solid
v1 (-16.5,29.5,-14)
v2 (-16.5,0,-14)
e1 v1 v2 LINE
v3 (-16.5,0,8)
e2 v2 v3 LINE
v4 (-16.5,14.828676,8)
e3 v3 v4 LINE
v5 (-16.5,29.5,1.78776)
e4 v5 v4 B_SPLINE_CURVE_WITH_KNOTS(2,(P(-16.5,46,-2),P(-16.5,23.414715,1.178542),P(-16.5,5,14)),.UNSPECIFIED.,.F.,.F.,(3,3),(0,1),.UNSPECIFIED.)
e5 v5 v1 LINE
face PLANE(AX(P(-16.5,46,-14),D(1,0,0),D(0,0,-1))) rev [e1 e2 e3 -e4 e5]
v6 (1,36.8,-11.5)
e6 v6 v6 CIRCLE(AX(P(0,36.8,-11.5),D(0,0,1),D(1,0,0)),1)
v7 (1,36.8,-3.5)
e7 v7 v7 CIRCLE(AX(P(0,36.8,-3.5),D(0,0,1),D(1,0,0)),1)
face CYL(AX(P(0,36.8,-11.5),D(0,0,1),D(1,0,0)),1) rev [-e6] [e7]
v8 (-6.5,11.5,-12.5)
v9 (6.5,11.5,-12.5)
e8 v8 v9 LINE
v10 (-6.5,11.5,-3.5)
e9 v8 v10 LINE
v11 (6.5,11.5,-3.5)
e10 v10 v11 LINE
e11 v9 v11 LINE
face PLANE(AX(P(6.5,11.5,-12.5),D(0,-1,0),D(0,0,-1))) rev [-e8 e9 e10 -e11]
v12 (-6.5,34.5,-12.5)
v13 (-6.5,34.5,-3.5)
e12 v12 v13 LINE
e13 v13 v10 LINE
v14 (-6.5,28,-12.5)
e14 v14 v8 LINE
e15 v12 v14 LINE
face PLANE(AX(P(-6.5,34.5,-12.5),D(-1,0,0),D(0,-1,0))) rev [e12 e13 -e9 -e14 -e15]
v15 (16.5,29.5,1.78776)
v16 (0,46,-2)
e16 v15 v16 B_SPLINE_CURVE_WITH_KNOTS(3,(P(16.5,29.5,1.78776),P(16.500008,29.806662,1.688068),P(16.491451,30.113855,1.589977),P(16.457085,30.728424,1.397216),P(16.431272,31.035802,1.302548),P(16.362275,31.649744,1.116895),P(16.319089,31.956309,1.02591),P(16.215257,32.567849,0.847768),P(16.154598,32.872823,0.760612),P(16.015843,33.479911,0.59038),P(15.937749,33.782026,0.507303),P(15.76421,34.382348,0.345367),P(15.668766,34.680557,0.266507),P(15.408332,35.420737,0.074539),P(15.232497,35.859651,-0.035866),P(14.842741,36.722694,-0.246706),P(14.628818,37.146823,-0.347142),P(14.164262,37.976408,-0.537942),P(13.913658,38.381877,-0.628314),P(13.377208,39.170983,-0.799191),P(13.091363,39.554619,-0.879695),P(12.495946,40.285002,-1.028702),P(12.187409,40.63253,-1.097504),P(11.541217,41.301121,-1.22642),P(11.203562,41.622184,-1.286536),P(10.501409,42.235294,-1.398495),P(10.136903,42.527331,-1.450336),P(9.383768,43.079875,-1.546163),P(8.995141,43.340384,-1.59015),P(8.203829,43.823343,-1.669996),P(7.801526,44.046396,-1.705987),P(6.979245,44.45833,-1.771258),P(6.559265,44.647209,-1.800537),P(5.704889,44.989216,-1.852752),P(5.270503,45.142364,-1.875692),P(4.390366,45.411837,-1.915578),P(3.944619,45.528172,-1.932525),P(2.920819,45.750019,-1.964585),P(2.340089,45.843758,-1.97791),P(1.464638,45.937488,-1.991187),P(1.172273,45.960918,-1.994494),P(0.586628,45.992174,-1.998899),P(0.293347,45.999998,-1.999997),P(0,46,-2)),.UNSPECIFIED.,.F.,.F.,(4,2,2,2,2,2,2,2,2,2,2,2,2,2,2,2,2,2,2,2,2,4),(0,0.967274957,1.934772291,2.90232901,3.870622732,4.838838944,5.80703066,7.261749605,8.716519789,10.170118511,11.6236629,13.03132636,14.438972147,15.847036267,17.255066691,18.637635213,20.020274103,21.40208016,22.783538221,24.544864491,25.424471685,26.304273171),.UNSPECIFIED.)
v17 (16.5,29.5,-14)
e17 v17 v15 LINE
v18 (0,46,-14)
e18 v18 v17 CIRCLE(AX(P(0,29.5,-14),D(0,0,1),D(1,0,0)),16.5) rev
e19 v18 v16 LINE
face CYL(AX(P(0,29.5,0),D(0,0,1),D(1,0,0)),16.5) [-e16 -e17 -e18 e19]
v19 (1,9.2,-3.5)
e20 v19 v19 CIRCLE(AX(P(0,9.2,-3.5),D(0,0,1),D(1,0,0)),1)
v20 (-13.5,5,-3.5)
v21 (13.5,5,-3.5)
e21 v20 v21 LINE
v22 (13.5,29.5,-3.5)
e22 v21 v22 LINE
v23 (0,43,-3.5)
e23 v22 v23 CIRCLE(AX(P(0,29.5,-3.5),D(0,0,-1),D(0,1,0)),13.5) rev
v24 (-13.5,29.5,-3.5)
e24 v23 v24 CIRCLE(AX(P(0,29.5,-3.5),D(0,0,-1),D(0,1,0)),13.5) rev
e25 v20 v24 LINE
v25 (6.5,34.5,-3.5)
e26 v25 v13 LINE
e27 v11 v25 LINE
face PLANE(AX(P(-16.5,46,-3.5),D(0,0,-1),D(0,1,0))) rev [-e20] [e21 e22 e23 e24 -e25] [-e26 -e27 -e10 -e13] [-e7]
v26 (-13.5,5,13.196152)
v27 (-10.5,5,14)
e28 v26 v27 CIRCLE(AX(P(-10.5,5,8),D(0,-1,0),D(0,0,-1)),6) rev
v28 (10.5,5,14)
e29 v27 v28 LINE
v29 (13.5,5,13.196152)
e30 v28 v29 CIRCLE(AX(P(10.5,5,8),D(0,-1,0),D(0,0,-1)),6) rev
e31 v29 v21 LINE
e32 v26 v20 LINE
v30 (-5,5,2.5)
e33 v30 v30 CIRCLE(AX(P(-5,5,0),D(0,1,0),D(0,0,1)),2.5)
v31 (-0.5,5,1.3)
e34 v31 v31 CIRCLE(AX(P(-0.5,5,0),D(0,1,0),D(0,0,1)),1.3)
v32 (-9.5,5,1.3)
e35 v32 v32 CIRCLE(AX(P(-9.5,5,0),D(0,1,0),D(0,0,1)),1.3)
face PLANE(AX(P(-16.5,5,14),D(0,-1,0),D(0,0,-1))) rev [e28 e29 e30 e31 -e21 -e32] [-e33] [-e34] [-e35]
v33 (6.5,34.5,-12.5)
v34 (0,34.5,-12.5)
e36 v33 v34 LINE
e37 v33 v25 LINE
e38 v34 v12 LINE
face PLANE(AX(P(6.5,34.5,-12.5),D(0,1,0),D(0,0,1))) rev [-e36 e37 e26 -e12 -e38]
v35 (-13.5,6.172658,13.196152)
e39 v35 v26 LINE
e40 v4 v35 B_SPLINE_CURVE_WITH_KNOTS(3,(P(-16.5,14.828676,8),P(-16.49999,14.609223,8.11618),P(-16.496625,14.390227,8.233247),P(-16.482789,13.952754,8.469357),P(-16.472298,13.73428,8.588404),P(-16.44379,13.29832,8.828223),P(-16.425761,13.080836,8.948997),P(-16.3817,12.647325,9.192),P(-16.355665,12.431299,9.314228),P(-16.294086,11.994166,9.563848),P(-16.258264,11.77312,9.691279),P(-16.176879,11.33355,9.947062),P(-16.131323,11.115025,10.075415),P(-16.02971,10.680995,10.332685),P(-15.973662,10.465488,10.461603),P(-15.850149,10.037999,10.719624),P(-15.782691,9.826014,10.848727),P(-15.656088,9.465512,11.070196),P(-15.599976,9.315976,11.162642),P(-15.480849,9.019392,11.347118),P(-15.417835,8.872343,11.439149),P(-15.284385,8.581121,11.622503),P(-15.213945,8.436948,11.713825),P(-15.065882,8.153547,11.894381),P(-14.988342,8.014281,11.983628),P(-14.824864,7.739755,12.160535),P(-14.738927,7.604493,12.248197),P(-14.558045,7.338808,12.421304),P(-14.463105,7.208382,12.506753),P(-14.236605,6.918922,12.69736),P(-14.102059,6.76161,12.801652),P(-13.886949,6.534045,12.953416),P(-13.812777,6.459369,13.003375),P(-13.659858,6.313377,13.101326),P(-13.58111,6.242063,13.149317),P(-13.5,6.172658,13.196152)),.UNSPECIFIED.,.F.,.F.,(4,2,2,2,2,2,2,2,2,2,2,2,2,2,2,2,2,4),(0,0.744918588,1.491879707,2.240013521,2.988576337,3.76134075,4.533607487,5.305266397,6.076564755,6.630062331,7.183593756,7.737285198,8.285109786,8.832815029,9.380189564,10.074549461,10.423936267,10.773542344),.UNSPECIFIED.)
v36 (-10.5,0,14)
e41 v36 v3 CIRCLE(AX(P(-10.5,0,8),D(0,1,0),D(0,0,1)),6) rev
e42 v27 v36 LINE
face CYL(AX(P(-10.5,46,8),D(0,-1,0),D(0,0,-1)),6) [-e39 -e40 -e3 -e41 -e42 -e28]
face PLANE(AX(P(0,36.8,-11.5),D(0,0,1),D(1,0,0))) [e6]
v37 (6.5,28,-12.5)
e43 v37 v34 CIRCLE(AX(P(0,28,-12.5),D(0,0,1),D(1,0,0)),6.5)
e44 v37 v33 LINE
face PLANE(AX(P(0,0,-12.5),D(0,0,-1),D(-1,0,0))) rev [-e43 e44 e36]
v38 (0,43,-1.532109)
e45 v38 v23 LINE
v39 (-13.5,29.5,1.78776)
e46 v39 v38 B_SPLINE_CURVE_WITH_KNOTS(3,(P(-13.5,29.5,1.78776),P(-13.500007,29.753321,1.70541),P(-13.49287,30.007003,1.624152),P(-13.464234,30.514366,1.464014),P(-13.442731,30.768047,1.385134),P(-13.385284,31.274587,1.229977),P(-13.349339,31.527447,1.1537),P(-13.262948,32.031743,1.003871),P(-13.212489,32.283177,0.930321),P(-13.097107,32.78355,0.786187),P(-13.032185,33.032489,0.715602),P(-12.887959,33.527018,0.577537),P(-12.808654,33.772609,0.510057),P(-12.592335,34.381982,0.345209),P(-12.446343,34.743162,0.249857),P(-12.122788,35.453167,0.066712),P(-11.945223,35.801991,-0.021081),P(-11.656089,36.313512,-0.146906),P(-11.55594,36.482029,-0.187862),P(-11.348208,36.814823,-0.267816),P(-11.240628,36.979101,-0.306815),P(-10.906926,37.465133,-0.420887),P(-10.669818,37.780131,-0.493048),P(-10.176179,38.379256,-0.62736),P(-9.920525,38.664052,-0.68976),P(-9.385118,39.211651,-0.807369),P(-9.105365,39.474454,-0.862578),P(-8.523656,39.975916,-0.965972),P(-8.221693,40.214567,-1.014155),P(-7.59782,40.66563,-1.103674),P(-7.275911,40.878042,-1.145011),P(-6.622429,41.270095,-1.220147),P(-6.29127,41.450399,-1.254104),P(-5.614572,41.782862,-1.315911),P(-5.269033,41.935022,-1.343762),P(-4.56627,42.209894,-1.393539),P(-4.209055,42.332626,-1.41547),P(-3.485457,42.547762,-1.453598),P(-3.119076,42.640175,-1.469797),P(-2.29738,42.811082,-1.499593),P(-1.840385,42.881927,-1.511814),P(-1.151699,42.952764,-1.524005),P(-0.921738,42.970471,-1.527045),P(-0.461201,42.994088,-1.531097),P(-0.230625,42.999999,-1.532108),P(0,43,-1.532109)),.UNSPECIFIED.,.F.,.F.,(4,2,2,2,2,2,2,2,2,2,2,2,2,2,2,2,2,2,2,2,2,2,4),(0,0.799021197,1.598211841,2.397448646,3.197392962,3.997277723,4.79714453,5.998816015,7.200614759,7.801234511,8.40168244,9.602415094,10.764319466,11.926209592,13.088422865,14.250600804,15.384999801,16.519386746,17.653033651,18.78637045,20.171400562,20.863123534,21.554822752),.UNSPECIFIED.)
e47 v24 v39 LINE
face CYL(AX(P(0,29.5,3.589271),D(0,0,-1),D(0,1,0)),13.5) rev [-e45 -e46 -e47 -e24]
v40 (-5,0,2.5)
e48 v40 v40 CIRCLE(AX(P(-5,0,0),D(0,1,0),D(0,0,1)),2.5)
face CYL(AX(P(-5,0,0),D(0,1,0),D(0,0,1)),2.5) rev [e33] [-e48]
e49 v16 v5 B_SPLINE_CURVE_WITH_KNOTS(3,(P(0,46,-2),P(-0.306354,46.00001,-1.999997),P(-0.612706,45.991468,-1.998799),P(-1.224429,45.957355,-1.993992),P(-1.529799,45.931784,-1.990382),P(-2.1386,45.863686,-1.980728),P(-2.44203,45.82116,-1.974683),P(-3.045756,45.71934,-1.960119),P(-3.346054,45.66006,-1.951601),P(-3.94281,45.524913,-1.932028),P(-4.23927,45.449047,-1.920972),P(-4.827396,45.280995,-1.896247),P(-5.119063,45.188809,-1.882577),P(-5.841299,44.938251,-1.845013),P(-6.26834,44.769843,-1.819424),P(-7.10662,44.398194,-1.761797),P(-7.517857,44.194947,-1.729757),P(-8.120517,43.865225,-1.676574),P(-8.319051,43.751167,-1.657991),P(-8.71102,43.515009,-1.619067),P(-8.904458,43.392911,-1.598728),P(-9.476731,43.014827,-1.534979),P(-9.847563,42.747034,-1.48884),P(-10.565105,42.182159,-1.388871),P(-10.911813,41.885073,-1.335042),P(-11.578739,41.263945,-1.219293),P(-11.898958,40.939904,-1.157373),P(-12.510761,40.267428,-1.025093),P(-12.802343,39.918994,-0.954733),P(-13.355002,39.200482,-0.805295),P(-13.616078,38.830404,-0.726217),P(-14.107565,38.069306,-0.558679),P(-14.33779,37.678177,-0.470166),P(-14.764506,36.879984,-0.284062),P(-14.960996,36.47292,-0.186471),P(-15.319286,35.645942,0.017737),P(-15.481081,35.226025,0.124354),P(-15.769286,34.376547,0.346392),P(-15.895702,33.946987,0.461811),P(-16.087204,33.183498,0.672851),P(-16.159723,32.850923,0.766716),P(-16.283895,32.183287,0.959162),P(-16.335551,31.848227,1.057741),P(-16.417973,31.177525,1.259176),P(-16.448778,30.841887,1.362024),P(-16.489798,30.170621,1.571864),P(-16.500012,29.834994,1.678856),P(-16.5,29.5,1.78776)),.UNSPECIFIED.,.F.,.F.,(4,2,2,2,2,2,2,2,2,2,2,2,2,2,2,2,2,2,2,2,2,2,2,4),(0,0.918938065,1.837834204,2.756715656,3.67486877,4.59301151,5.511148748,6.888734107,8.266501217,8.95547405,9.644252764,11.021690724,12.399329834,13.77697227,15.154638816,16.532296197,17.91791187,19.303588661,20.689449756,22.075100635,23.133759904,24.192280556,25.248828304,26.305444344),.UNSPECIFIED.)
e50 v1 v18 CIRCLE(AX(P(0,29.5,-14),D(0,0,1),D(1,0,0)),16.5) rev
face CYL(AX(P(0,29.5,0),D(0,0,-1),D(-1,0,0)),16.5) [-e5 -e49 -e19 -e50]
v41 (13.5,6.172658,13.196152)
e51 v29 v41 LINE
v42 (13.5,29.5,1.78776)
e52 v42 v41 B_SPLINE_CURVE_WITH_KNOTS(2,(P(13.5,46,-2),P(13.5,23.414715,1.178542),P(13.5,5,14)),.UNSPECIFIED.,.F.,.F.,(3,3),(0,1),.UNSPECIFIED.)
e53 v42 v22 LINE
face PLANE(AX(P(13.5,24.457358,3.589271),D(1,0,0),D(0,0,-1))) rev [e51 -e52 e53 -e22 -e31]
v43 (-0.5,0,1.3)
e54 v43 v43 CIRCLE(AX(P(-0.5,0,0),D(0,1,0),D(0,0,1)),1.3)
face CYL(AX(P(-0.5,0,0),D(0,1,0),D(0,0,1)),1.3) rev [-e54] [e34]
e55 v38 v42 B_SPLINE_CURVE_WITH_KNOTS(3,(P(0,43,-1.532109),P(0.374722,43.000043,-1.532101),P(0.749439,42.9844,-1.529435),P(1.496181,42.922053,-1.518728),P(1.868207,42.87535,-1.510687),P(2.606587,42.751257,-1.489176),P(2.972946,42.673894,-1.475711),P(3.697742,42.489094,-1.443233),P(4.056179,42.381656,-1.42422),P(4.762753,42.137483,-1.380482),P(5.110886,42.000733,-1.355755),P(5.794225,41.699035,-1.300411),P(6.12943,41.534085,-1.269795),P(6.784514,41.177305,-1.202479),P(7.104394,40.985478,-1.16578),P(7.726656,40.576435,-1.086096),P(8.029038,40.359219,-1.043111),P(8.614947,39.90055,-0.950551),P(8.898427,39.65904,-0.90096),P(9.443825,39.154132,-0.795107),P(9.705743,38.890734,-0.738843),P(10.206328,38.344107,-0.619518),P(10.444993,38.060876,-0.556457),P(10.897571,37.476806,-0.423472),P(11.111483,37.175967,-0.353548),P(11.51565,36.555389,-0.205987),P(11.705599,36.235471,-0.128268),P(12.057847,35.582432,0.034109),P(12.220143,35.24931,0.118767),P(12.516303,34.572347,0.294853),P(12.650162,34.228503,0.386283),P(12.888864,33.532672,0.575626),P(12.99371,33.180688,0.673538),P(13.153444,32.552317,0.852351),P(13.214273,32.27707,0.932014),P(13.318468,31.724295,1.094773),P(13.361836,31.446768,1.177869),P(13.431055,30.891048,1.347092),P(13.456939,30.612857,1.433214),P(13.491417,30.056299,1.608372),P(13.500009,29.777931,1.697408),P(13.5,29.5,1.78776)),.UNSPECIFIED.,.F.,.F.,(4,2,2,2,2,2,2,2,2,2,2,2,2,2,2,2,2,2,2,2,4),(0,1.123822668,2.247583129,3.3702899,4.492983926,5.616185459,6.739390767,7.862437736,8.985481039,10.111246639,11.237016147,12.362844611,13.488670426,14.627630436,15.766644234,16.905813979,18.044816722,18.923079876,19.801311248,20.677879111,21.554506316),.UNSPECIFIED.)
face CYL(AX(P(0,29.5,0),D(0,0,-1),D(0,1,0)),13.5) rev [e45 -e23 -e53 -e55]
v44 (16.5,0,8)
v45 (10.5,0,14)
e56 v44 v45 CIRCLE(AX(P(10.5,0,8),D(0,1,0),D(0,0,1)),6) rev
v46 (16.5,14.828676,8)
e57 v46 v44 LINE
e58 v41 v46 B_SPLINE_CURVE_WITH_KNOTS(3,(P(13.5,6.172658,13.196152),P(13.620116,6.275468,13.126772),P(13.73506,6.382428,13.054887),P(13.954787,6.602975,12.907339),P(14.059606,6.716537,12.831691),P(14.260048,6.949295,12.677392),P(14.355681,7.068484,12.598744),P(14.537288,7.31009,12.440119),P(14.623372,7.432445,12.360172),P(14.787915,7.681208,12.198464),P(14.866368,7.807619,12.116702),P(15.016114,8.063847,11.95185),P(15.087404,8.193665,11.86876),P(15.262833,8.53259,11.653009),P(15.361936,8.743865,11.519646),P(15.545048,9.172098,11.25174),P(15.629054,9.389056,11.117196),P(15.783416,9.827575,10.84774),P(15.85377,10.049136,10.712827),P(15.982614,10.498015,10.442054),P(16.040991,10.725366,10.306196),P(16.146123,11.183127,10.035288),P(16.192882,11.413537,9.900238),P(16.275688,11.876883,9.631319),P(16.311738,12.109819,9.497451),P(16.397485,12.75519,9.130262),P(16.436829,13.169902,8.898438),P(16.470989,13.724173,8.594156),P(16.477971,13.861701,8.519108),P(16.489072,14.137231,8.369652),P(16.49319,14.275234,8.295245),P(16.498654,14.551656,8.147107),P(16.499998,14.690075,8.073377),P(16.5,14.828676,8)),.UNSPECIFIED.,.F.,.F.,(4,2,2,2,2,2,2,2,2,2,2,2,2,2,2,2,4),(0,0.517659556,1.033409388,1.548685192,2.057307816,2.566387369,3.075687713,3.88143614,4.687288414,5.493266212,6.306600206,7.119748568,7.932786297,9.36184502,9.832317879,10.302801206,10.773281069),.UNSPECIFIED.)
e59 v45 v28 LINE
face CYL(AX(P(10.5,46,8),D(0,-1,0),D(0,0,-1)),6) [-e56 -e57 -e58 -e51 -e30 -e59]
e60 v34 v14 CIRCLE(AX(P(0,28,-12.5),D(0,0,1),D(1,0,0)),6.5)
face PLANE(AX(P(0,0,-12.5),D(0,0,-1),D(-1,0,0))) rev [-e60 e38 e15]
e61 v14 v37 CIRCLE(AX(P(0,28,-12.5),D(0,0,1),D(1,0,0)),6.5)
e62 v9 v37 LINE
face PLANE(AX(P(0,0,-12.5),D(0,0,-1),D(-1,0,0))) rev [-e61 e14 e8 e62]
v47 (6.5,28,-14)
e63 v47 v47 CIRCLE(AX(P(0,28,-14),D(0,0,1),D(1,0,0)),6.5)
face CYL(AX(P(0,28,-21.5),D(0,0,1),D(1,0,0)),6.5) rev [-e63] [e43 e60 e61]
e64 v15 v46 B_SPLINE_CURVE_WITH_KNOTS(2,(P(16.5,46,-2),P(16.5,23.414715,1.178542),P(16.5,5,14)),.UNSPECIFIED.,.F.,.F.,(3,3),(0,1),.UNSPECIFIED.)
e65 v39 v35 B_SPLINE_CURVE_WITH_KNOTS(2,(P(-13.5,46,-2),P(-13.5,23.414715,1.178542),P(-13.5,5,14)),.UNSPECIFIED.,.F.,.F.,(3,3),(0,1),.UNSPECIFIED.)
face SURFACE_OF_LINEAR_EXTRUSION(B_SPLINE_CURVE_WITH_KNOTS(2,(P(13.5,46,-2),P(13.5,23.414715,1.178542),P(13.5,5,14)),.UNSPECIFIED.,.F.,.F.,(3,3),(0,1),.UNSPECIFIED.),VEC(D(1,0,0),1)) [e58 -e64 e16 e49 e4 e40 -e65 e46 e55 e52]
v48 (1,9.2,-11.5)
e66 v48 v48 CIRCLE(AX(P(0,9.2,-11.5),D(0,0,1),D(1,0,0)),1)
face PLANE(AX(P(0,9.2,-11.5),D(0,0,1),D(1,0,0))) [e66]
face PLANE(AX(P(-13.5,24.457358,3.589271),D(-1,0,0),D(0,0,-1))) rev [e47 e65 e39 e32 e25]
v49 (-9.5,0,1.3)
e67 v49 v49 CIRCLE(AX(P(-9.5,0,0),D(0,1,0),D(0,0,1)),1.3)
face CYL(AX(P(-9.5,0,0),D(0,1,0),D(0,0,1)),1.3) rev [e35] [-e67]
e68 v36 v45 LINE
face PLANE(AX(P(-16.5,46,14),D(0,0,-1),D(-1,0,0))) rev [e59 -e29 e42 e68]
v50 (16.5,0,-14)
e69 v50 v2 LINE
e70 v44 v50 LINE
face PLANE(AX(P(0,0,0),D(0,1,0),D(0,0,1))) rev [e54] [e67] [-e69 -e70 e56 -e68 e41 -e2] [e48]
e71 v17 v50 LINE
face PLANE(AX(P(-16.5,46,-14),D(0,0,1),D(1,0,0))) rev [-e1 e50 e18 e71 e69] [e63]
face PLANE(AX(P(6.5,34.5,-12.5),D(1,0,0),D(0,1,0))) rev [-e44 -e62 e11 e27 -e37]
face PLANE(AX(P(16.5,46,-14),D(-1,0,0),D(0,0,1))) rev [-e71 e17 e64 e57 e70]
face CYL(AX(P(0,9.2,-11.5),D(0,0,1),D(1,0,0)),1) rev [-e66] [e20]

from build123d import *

# Parameters (mm, degrees)
SKETCH1_W           = 33
SKETCH1_H           = 28
BOSS_EXTRUDE1_DEPTH = 46
SKETCH2_W           = 17.5
SKETCH2_H           = 41
CUT_EXTRUDE1_DEPTH  = 59.318093247
EXTRUDE_S_DEPTH     = 3
BOSS_EXTRUDE3_DEPTH = 27
FILLET1_START       = -3.5
FILLET1_DEPTH       = 5.287760197
FILLET1_START_2     = -13.5
FILLET1_2_DEPTH     = 27
FILLET2_R           = 16.5
FILLET3_R           = 6
SKETCH5_W           = 13
SKETCH5_H           = 23
CUT_EXTRUDE3_DEPTH  = 9
SKETCH6_R           = 6.5
CUT_EXTRUDE4_DEPTH  = 9
SKETCH7_R           = 1
CUT_EXTRUDE5_DEPTH  = 8
SKETCH8_R           = 1.3
SKETCH8_R_2         = 2.5
CUT_EXTRUDE6_DEPTH  = 47.360004895


with BuildPart() as part:
    # Sketch1 → Boss-Extrude1 (new body)
    with BuildSketch(Plane(origin=(0, 0, 0), x_dir=(1, 0, 0), z_dir=(0, 1, 0))):
        Rectangle(SKETCH1_W, SKETCH1_H)
    extrude(amount=BOSS_EXTRUDE1_DEPTH)

    # Sketch2 → Cut-Extrude1 (cut, through all)
    with BuildSketch(Plane(origin=(16.5, 0, 0), x_dir=(0, 0, -1), z_dir=(1, 0, 0))):
        with Locations((-5.25, 25.5)):
            Rectangle(SKETCH2_W, SKETCH2_H)
    extrude(amount=-CUT_EXTRUDE1_DEPTH, mode=Mode.SUBTRACT)

    # Sketch3 → Extrude S (add)
    with BuildSketch(Plane(origin=(16.5, 0, 0), x_dir=(0, 0, -1), z_dir=(1, 0, 0))):
        with BuildLine():
            Line((-14, 5), (3.5, 5))
            Line((3.5, 5), (3.5, 46))
            Line((3.5, 46), (2, 46))
            add(Edge.make_bspline(
                [(2, 46), (-1.17854194, 23.414715012), (-14, 5)],
                knots=[0, 0, 0, 1, 1, 1], degree=2))
        make_face()
    extrude_s = extrude(amount=-EXTRUDE_S_DEPTH)

    # Mirror1: Extrude S across plane
    add(extrude_s.mirror(Plane(origin=(0, 0, 0), x_dir=(0, 0, 1), z_dir=(1, 0, 0))))

    # Sketch4 → Boss-Extrude3 (add)
    with BuildSketch(Plane.ZY.offset(-13.5)):
        with BuildLine():
            Line((-3.5, 46), (-3.5, 43))
            Line((-3.5, 43), (-1.532109396, 43))
            add(Edge.make_bspline(
                [(-1.532109396, 43), (-1.787586761, 44.490687359), (-1.999999999, 45.999999992)],
                knots=[0.933172744, 0.933172744, 0.933172744, 1, 1, 1], degree=2))
            Line((-1.999999999, 45.999999992), (-3.5, 46))
        make_face()
    extrude(amount=BOSS_EXTRUDE3_DEPTH)

    # Fillet1: read off the stored shape, not the designer's step
    # Fillet1 outline → Fillet1 (add)
    with BuildSketch(Plane.XY.offset(FILLET1_START)):
        with BuildLine():
            Line((-13.5, 43), (-13.5, 29.5))
            ThreePointArc((-13.5, 29.5), (-9.545941546, 39.045941546), (0, 43))
            Line((0, 43), (-13.5, 43))
        make_face()
        with BuildLine():
            Line((13.5, 43), (0, 43))
            ThreePointArc((0, 43), (9.545941546, 39.045941546), (13.5, 29.5))
            Line((13.5, 29.5), (13.5, 43))
        make_face()
    extrude(amount=FILLET1_DEPTH)

    # Fillet1 2 outline → Fillet1 2 (cut)
    with BuildSketch(Plane.YZ.offset(FILLET1_START_2)):
        with BuildLine():
            add(Edge.make_bspline(
                [(43, -1.532109396), (36.047422478, -0.340560963), (29.499999971, 1.787760107)],
                knots=[0.066827257, 0.066827257, 0.066827257, 0.378510105, 0.378510105, 0.378510105], degree=2))
            Line((43, -1.532109396), (43, 1.787760197))
            Line((43, 1.787760197), (29.499999971, 1.787760107))
        make_face()
    extrude(amount=FILLET1_2_DEPTH, mode=Mode.SUBTRACT)

    # Fillet2
    # the kernel refuses this fillet: 16.5 mm, written as the material it takes off along each edge
    with BuildSketch(Plane(origin=(16.5, 46, -55.25), x_dir=(0, -1, 0), z_dir=(0, 0, 1)), Plane(origin=(-16.5, 46, 39.25), x_dir=(0, -1, 0), z_dir=(0, 0, -1))) as fillet2_piece_1:
        with BuildLine():
            CenterArc((FILLET2_R, -FILLET2_R), FILLET2_R, 90, 90)
            Line((0, -FILLET2_R), (0, 0))
            Line((0, 0), (FILLET2_R, 0))
        make_face()
    extrude(amount=94.5, mode=Mode.SUBTRACT)

    # Fillet3
    # the kernel refuses this fillet: 6 mm, written as the material it takes off along each edge
    with BuildSketch(Plane(origin=(16.5, -15, 14), x_dir=(0, 0, -1), z_dir=(0, 1, 0)), Plane(origin=(-16.5, -15, 14), x_dir=(1, 0, 0), z_dir=(0, 1, 0))) as fillet3_piece_1:
        with BuildLine():
            CenterArc((FILLET3_R, FILLET3_R), FILLET3_R, 180, 90)
            Line((0, FILLET3_R), (0, 0))
            Line((0, 0), (FILLET3_R, 0))
        make_face()
    extrude(amount=35, mode=Mode.SUBTRACT)

    # Sketch5 → Cut-Extrude3 (cut)
    with BuildSketch(Plane.XY.offset(-3.5)):
        with Locations((0, 23)):
            Rectangle(SKETCH5_W, SKETCH5_H)
    extrude(amount=-CUT_EXTRUDE3_DEPTH, mode=Mode.SUBTRACT)

    # Sketch6 → Cut-Extrude4 (cut)
    with BuildSketch(Plane.XY.offset(-12.5)):
        with Locations((0, 28)):
            Circle(SKETCH6_R)
    extrude(amount=-CUT_EXTRUDE4_DEPTH, mode=Mode.SUBTRACT)

    # Sketch7 → Cut-Extrude5 (cut)
    with BuildSketch(Plane.XY.offset(-3.5)):
        with Locations((0, 36.8)):
            Circle(SKETCH7_R)
        with Locations((0, 9.2)):
            Circle(SKETCH7_R)
    extrude(amount=-CUT_EXTRUDE5_DEPTH, mode=Mode.SUBTRACT)

    # Sketch8 → Cut-Extrude6 (cut, through all)
    with BuildSketch(Plane(origin=(0, 5, 0), x_dir=(1, 0, 0), z_dir=(0, 1, 0))):
        with Locations(Location((-0.5, 0, 0), (0, 0, 270))):
            Circle(SKETCH8_R)
        with Locations(Location((-5, 0, 0), (0, 0, 270))):
            Circle(SKETCH8_R_2)
        with Locations(Location((-9.5, 0, 0), (0, 0, 270))):
            Circle(SKETCH8_R)
    extrude(amount=-CUT_EXTRUDE6_DEPTH, mode=Mode.SUBTRACT)


solid = part.part
